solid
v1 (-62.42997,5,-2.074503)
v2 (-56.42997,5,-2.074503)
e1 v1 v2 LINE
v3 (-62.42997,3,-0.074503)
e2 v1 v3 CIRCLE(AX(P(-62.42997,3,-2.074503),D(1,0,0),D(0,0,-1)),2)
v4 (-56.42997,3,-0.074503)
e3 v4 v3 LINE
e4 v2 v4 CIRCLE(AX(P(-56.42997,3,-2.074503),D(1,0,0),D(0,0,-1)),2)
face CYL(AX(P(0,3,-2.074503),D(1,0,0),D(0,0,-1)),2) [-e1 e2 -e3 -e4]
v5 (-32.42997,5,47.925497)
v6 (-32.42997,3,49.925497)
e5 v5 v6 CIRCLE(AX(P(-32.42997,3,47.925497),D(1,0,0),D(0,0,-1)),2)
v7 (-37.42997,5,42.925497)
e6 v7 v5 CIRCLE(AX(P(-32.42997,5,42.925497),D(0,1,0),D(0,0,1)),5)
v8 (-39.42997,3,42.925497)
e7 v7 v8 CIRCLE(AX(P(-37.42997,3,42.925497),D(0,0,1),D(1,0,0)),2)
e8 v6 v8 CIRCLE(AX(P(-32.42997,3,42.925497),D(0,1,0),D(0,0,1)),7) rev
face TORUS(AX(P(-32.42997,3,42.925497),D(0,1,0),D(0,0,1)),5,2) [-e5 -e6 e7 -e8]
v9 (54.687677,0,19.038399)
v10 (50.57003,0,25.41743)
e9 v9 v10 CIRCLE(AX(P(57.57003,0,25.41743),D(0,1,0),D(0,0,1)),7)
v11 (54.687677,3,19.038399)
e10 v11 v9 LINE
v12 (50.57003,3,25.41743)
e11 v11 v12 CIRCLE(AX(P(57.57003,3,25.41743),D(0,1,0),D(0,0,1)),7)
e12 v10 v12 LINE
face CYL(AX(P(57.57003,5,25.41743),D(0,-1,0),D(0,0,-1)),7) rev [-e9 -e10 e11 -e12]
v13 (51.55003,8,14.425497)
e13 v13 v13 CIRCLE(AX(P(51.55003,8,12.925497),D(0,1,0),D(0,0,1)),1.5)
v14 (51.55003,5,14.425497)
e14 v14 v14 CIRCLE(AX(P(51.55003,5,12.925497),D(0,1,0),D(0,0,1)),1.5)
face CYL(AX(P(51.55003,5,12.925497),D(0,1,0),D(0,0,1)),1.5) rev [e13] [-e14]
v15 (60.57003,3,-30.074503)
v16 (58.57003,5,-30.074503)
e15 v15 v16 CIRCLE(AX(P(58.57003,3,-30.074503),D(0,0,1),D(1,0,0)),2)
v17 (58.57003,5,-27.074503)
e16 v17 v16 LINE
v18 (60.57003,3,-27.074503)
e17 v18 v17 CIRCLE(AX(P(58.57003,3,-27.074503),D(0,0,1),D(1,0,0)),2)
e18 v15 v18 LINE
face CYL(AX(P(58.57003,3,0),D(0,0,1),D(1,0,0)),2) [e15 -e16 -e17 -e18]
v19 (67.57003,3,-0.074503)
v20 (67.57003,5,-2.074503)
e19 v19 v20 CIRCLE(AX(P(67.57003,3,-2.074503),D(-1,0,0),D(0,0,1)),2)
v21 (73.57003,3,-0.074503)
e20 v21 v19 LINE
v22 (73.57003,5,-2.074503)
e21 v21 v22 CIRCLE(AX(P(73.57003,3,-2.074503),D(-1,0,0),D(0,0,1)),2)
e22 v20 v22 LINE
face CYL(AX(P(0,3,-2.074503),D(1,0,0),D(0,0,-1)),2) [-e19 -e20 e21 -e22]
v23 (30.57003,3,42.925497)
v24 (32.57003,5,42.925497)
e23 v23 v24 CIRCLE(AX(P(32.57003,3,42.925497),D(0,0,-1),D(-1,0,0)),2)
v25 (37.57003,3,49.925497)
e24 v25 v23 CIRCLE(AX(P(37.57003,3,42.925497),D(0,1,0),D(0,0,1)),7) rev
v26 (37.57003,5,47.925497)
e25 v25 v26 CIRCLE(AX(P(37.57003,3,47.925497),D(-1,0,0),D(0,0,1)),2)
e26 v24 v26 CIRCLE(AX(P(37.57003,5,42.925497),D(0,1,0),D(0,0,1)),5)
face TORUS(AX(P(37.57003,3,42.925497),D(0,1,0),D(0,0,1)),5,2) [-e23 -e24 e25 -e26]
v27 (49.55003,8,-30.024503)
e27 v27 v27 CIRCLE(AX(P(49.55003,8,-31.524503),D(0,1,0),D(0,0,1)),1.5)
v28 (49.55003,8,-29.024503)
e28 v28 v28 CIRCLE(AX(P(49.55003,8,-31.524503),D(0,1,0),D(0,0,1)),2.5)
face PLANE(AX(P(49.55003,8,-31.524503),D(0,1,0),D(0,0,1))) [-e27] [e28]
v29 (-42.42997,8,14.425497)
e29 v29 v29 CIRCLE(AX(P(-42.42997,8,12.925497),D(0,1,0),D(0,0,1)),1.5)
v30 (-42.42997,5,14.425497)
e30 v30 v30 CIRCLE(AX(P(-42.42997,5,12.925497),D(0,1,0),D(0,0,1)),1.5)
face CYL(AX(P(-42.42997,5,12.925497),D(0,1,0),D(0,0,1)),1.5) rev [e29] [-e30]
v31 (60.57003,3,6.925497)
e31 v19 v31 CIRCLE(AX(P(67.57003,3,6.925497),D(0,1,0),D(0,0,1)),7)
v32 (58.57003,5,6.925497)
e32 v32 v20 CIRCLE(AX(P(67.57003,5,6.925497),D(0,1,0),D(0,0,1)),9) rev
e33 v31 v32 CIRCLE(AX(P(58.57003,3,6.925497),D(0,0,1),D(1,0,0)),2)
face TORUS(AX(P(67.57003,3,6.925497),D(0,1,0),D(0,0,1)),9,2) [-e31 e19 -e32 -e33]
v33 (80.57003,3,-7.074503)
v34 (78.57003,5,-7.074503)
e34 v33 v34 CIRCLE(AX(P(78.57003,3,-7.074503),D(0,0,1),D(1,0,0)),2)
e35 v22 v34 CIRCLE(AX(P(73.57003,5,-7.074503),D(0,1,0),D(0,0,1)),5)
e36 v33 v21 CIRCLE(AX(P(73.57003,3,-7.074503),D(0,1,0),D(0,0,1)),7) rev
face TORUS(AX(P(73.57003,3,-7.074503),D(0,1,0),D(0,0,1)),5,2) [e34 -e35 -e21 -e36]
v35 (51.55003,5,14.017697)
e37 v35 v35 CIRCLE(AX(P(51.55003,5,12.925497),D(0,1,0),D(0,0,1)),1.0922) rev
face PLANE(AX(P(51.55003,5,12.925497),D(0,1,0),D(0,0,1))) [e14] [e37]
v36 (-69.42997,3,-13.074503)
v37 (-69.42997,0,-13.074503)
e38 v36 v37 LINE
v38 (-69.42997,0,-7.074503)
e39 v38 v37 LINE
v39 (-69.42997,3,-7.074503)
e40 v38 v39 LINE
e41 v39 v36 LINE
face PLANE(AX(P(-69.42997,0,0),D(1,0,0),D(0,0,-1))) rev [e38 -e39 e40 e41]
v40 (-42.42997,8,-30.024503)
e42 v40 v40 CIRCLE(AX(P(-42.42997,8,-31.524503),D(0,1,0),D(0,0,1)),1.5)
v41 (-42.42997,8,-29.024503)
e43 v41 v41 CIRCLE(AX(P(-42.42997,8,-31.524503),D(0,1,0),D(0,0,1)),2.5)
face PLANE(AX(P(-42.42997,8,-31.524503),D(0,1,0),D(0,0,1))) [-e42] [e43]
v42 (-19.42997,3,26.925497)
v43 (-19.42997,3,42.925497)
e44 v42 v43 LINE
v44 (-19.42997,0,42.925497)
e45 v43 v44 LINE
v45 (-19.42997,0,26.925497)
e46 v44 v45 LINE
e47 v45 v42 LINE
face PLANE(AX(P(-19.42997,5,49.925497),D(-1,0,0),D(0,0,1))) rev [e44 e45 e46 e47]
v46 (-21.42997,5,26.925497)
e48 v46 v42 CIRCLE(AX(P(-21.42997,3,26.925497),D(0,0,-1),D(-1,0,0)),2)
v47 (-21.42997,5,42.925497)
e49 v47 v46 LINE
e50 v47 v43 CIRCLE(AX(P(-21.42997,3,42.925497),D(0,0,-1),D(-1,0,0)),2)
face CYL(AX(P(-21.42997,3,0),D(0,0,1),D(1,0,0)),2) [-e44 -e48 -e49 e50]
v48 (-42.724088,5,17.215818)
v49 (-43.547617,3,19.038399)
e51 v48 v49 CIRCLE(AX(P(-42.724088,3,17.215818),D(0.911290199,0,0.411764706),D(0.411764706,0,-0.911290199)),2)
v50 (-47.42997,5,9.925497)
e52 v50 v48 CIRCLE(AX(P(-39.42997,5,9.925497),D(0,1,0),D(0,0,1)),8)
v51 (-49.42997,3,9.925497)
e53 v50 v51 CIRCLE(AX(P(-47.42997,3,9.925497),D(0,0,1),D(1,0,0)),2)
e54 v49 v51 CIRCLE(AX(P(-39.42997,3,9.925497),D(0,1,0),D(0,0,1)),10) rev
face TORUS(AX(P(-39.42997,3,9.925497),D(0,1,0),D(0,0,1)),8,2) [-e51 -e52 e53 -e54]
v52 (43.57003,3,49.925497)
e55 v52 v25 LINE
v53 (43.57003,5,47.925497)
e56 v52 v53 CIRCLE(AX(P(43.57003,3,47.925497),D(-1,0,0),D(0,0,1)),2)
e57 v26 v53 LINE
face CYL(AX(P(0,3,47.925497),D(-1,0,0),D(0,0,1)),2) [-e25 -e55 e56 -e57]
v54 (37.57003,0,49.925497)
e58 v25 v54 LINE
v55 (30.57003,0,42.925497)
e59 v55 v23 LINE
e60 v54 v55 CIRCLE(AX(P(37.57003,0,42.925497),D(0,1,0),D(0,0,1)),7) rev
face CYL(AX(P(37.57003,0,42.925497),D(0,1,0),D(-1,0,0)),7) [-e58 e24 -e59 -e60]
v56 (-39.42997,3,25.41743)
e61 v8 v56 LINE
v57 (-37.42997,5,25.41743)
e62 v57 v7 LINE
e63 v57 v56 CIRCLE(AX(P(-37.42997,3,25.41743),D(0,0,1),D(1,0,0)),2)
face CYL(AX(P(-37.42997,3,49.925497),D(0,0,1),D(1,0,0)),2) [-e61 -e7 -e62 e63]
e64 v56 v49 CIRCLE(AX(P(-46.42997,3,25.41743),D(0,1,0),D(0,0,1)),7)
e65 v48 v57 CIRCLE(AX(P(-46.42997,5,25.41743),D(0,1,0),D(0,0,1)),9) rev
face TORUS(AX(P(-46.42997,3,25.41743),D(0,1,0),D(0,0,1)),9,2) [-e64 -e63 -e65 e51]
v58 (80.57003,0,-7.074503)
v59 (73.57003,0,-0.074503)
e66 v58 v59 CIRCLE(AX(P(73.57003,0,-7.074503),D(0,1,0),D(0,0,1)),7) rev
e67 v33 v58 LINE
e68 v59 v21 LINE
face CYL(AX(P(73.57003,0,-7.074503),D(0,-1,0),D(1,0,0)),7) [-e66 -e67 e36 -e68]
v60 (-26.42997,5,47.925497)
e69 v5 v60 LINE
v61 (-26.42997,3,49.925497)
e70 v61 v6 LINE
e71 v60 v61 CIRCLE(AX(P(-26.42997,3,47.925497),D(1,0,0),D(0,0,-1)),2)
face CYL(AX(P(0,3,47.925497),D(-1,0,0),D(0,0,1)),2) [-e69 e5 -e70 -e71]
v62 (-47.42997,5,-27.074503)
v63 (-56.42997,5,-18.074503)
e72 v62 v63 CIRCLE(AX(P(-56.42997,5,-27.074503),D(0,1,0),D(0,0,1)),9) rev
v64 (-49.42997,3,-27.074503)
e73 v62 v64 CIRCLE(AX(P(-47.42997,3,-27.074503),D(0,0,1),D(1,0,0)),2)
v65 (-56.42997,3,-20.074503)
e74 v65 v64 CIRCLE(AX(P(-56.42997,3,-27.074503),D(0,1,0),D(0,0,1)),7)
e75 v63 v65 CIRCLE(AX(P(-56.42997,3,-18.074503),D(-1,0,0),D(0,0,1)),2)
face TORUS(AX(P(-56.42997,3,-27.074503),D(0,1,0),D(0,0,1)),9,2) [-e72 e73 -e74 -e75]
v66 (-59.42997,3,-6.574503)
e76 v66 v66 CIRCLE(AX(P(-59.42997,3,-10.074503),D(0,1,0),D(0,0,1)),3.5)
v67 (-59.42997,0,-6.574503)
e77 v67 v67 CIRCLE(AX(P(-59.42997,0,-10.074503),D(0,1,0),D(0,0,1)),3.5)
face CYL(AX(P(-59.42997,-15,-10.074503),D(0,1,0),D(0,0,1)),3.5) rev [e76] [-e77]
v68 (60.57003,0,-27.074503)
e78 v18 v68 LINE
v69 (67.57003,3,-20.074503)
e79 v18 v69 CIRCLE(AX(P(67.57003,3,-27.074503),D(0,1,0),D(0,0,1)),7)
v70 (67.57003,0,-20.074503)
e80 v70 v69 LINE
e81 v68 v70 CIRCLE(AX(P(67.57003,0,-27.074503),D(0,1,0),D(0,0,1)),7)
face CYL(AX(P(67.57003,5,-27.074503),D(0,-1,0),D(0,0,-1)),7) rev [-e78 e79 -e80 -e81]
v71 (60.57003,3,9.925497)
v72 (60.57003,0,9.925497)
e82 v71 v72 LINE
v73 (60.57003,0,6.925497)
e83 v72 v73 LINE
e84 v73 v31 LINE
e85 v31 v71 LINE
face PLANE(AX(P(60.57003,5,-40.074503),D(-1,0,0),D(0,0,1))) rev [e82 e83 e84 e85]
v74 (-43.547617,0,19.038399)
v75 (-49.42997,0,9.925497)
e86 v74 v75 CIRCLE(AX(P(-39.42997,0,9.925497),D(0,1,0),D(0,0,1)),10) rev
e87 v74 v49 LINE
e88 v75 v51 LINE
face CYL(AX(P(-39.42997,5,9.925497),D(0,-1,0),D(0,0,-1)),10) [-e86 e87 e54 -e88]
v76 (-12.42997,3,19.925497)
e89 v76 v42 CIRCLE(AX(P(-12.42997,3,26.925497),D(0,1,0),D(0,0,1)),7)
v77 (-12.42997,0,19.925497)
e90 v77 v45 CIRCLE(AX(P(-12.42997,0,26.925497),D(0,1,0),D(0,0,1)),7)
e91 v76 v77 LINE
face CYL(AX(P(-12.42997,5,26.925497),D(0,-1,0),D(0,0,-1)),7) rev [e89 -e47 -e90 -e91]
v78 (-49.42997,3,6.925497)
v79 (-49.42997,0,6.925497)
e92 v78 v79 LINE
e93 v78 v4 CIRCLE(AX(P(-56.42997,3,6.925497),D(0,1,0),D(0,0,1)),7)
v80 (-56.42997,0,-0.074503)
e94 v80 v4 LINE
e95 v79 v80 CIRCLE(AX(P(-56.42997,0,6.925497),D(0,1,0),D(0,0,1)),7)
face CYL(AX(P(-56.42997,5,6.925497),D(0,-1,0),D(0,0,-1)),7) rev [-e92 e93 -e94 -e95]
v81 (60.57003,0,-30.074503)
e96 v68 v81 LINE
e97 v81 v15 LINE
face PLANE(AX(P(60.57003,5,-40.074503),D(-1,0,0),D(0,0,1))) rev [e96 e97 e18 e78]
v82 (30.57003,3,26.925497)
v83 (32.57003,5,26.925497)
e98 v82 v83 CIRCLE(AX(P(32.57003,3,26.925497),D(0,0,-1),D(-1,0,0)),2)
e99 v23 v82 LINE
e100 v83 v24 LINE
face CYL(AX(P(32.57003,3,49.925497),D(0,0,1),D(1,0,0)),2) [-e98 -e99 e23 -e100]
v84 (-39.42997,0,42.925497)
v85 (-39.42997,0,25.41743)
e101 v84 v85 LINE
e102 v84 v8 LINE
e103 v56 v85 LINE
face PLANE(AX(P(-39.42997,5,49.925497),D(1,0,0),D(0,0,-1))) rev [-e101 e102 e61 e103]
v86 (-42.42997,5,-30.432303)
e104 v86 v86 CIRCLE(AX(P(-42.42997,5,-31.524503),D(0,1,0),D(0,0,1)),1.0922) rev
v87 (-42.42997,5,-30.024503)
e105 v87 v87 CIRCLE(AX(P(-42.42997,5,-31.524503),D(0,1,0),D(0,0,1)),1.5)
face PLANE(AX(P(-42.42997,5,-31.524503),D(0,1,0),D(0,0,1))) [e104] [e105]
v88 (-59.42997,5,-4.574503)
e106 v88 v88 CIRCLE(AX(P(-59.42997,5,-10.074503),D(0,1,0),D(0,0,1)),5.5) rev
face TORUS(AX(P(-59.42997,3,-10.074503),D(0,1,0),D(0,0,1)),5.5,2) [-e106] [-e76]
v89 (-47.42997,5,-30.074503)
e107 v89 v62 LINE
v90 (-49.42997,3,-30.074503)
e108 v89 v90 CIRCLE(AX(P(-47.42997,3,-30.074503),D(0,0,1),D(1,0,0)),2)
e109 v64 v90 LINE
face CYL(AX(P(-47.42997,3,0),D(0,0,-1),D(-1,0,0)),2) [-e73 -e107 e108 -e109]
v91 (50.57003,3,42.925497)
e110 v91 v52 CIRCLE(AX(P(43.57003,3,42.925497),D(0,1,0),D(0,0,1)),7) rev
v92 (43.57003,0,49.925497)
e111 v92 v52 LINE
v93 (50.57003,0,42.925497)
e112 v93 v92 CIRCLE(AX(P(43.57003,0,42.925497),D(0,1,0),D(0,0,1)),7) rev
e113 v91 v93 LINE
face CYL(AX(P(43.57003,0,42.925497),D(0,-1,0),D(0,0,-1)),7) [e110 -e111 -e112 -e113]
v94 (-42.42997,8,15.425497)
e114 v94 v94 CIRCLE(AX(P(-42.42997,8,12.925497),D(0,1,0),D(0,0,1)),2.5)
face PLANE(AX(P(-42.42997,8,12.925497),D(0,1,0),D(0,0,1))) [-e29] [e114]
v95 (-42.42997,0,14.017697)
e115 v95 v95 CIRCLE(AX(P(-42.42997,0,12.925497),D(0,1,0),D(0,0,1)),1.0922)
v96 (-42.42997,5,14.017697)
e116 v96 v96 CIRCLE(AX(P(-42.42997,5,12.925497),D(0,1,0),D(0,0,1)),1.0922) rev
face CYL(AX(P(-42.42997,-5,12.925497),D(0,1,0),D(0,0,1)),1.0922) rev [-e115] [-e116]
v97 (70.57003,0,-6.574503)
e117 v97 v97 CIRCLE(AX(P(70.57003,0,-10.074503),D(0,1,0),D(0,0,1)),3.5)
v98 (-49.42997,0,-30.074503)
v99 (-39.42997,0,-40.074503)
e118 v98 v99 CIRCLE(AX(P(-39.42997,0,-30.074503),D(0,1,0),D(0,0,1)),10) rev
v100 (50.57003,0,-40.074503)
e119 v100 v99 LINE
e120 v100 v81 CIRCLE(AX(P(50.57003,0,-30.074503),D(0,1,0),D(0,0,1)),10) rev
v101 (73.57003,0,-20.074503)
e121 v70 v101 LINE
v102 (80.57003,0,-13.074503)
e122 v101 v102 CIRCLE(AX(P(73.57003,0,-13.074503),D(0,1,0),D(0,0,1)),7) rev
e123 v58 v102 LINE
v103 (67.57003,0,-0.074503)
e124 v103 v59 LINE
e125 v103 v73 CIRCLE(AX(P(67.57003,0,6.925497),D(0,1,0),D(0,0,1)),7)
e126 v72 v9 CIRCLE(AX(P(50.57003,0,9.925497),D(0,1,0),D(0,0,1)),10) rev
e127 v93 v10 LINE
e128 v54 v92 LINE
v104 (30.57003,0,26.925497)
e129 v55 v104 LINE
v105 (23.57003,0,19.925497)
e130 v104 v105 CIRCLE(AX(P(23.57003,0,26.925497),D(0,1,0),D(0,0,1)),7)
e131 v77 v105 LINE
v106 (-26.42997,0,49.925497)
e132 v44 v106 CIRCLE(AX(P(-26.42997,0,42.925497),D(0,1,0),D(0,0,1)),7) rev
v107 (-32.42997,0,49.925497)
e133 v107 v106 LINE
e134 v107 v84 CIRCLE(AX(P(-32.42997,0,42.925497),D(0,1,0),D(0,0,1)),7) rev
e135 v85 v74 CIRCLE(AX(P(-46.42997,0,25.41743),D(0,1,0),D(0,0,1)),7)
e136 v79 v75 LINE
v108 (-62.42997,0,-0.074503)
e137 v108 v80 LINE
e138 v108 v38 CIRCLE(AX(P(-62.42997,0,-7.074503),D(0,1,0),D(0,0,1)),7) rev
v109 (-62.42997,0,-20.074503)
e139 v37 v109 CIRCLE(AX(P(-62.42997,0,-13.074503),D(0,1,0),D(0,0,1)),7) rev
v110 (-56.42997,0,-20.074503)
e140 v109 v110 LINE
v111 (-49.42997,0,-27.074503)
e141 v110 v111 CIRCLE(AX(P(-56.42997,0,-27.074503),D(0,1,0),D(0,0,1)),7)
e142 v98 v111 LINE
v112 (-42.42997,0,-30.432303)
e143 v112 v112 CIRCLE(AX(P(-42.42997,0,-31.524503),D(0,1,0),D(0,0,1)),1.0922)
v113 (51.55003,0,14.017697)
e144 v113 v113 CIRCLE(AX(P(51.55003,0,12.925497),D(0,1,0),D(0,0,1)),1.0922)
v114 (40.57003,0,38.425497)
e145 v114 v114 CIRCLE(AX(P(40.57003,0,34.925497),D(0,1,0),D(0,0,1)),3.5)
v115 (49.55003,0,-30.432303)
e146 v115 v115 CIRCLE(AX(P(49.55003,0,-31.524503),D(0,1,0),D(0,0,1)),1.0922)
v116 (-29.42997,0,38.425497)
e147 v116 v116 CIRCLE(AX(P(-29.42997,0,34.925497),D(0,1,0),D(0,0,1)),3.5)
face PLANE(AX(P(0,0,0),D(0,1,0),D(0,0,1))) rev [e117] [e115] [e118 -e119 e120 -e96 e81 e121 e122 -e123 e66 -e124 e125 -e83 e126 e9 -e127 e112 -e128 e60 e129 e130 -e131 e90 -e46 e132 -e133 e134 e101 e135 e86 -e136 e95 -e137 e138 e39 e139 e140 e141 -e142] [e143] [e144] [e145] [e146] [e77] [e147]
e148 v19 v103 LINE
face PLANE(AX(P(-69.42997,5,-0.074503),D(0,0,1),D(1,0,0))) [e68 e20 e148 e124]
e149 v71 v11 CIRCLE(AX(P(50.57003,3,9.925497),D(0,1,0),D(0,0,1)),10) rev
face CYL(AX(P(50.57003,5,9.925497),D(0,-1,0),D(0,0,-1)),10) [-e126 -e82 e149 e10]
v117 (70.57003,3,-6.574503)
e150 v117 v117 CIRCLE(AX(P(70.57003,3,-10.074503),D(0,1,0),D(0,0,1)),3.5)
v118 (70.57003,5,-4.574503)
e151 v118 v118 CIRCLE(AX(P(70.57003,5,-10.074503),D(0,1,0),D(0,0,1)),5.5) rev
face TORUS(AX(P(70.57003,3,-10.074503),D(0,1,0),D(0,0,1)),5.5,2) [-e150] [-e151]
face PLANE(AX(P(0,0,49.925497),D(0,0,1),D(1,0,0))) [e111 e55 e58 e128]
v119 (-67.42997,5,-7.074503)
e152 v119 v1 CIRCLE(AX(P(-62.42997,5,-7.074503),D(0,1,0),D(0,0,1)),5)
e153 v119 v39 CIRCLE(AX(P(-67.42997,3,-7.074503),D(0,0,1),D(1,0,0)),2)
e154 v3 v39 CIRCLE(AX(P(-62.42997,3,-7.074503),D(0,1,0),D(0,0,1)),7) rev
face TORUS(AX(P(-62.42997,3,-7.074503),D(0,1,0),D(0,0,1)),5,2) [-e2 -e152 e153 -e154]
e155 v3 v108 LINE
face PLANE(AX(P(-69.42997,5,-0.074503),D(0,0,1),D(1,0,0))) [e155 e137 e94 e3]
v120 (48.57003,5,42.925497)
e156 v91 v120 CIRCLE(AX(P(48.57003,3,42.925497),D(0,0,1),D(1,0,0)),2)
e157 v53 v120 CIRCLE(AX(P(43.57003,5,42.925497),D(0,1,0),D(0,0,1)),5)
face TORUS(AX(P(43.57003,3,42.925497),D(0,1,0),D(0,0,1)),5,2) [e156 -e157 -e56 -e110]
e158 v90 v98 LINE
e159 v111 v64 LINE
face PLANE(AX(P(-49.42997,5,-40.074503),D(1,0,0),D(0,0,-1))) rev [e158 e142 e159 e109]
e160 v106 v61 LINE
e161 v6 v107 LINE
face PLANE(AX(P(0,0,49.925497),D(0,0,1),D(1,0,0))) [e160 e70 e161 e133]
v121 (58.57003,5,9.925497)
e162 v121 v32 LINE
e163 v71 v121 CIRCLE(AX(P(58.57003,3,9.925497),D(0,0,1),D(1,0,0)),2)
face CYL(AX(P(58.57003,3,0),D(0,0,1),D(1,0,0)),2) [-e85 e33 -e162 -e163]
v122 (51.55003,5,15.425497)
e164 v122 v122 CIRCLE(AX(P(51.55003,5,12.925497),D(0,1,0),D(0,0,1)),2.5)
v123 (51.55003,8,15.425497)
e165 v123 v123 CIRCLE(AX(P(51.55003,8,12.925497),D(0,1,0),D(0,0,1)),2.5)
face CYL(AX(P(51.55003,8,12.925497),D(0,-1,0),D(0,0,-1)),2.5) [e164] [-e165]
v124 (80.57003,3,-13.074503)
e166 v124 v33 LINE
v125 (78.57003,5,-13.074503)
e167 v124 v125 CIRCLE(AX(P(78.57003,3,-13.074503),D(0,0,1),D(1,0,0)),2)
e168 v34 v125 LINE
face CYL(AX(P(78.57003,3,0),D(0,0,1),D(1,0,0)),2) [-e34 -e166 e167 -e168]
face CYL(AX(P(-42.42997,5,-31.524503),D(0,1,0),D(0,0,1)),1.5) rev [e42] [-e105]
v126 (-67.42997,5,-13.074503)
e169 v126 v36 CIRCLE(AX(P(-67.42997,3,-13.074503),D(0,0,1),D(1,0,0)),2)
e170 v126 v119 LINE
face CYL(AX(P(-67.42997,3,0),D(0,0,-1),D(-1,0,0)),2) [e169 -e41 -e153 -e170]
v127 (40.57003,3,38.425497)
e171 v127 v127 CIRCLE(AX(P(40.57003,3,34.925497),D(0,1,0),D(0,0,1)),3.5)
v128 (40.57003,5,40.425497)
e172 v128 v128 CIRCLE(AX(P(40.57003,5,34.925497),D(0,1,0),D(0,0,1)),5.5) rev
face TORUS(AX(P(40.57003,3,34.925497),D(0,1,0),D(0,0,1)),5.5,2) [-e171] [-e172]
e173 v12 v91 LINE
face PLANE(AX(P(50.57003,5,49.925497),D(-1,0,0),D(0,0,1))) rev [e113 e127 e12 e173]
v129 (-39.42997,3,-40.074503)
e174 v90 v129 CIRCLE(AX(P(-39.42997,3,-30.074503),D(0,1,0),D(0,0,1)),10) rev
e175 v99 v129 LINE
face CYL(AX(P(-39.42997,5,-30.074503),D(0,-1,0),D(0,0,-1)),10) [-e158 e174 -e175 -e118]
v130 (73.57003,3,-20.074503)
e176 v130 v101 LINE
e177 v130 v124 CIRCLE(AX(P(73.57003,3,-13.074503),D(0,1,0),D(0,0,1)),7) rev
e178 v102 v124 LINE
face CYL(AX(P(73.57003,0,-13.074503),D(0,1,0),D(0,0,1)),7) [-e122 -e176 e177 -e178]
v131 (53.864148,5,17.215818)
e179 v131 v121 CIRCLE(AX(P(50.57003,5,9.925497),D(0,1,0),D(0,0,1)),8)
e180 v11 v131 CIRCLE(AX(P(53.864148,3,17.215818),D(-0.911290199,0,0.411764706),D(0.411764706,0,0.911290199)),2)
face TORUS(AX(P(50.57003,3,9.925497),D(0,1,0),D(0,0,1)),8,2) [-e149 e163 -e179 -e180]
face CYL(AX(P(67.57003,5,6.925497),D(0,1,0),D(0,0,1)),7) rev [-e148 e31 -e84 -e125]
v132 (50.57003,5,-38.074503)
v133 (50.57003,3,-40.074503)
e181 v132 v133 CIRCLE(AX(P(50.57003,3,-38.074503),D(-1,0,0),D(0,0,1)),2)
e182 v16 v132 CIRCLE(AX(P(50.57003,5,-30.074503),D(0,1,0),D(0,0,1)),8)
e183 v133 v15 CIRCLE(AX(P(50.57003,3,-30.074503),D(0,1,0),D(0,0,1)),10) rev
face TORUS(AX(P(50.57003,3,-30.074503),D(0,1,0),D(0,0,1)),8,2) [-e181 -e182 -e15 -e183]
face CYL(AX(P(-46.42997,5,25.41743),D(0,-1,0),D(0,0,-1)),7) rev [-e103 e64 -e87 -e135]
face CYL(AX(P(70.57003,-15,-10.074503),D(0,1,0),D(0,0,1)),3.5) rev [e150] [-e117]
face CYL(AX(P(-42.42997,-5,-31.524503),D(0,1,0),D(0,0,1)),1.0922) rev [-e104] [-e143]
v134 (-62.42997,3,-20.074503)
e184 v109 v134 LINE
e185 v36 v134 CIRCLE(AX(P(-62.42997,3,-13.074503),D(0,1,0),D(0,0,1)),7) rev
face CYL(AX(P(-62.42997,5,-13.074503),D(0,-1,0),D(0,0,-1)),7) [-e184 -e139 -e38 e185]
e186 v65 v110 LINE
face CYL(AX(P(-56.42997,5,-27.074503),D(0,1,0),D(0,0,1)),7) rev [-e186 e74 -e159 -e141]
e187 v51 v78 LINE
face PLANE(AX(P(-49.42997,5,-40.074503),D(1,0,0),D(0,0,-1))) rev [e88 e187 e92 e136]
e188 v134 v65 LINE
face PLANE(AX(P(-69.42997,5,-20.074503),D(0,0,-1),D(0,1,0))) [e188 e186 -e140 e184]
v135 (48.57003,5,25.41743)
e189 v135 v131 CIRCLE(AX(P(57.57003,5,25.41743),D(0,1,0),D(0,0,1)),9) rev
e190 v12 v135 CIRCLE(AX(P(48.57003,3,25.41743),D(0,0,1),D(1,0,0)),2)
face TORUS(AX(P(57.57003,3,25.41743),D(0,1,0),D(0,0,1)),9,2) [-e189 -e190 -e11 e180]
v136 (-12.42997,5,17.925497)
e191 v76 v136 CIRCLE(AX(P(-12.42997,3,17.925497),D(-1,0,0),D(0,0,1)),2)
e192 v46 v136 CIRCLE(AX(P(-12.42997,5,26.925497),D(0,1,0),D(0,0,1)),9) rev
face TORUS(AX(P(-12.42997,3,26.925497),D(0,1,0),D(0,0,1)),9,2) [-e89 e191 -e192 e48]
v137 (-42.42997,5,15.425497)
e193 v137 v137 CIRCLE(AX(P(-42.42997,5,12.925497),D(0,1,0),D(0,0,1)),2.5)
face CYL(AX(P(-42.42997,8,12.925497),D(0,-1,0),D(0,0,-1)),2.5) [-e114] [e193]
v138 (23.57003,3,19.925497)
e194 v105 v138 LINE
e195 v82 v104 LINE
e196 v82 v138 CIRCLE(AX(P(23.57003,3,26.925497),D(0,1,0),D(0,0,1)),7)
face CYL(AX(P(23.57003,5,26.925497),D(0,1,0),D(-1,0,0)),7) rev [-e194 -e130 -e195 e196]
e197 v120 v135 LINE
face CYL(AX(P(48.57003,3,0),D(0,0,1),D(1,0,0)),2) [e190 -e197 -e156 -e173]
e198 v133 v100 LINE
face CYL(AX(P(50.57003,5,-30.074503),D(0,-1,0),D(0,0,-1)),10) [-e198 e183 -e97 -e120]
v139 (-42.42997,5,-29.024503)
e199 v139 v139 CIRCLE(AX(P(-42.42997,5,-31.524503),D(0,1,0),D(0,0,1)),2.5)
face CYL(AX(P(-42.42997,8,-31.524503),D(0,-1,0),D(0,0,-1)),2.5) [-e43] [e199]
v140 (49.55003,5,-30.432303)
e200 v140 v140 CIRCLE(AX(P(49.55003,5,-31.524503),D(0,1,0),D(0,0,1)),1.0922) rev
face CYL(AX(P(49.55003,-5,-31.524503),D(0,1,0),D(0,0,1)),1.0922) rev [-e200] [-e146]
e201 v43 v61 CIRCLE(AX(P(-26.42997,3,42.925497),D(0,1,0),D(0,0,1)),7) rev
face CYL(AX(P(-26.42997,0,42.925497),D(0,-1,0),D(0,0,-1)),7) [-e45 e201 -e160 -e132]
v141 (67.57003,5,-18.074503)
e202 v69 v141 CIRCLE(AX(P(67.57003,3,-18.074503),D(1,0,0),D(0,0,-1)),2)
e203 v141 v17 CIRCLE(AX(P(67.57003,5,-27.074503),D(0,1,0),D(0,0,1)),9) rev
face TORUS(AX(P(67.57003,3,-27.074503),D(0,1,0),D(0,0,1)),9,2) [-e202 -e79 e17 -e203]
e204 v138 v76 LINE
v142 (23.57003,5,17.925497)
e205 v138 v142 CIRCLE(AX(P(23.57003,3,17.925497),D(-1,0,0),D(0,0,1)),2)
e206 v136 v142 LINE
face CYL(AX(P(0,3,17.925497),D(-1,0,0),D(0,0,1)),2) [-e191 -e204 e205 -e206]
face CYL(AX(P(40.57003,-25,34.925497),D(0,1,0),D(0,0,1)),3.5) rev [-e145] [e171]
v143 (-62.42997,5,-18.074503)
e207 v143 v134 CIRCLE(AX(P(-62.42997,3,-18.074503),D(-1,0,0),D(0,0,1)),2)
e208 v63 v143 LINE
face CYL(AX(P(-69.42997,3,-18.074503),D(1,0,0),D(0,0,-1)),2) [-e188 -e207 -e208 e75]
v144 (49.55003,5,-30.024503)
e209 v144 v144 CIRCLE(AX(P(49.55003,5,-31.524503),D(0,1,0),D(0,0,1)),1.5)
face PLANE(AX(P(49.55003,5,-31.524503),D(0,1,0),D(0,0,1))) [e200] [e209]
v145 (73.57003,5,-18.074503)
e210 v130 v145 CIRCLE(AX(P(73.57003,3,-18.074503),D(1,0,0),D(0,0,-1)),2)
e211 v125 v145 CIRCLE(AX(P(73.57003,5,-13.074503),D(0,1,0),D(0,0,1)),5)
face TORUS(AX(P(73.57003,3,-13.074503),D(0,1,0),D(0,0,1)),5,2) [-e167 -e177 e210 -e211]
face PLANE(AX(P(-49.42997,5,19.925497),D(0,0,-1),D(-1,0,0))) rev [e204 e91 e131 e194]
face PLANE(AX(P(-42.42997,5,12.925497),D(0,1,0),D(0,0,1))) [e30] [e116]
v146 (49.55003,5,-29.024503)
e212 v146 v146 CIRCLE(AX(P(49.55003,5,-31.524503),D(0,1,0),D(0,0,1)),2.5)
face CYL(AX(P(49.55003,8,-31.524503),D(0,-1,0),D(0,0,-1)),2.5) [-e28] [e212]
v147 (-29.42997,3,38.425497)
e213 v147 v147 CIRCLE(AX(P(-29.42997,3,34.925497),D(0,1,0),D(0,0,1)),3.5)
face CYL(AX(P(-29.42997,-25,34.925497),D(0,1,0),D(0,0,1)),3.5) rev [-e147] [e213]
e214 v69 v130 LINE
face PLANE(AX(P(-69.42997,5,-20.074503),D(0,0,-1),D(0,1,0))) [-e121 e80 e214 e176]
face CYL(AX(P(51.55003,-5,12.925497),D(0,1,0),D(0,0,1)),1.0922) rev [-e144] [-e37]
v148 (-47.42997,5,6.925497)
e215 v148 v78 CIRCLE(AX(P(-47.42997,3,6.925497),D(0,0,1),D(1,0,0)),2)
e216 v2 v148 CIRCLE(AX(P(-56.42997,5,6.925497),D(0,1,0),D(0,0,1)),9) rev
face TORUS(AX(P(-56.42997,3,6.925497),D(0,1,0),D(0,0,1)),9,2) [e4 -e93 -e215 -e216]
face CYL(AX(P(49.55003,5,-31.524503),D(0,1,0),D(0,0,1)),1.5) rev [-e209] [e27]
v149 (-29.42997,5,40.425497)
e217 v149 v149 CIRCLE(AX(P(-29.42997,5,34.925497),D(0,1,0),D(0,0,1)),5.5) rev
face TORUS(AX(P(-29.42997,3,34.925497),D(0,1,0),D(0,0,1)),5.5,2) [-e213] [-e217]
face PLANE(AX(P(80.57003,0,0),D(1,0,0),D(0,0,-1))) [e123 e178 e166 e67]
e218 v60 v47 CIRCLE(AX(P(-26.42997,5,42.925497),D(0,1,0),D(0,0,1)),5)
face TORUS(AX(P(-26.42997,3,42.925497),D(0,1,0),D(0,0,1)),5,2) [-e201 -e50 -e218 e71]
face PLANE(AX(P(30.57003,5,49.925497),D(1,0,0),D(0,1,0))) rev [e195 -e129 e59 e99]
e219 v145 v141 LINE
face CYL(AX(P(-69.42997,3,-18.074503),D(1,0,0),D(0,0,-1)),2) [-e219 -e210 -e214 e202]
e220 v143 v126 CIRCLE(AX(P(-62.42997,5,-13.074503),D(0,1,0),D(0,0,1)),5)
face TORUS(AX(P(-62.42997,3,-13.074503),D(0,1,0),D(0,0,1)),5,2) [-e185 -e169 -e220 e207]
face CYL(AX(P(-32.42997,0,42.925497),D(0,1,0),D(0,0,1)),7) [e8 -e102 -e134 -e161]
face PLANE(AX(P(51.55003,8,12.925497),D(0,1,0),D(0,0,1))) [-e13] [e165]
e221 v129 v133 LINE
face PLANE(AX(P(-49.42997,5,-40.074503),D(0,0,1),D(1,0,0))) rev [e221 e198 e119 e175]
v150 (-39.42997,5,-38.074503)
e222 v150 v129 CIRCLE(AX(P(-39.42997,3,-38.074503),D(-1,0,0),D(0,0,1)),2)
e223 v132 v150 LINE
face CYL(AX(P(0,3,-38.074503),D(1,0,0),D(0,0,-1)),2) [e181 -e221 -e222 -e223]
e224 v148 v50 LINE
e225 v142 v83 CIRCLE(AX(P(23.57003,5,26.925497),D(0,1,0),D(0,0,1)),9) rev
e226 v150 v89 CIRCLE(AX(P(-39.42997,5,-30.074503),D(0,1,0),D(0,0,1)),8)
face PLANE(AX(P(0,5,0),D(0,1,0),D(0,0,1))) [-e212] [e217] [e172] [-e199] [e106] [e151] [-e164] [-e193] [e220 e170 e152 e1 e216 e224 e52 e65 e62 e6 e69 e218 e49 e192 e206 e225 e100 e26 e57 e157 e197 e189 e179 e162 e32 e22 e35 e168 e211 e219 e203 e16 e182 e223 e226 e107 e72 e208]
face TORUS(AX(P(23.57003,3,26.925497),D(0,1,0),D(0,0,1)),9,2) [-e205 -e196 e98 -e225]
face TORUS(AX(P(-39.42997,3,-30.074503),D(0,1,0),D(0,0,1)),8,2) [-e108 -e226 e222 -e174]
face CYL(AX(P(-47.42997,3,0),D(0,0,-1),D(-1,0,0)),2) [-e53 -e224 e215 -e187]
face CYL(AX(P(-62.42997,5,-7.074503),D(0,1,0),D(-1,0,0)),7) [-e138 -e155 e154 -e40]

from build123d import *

# Parameters (mm, degrees)
SKETCH1_W                = 110
SKETCH1_H                = 60
BOSS_EXTRUDE1_DEPTH      = 5
SKETCH2_R                = 1.0922
CUT_EXTRUDE1_DEPTH       = 10
SKETCH3_R                = 2.5
BOSS_EXTRUDE2_DEPTH      = 3
SKETCH4_R                = 1.5
CUT_EXTRUDE2_DEPTH       = 3
BOSS_EXTRUDE3_DEPTH      = 20
BOSS_EXTRUDE3_DEPTH_BACK = 130
SKETCH5_W                = 20
SKETCH5_H                = 5
SKETCH6_R                = 3.5
CUT_EXTRUDE3_DEPTH       = 20
SKETCH7_W                = 20
SKETCH7_H                = 5
BOSS_EXTRUDE4_DEPTH      = 30
SKETCH8_R                = 3.5
CUT_EXTRUDE4_DEPTH       = 30
FILLET1_R                = 10
FILLET2_R                = 7
FILLET3_R                = 7
FILLET4_R                = 2
FILLET5_R                = 2
FILLET6_R                = 2


with BuildPart() as part:
    # Sketch1 → Boss-Extrude1 (new body)
    with BuildSketch(Plane(origin=(0, 0, 0), x_dir=(1, 0, 0), z_dir=(0, 1, 0))):
        with Locations((5.570029996, 10.074503483)):
            Rectangle(SKETCH1_W, SKETCH1_H)
    extrude(amount=BOSS_EXTRUDE1_DEPTH)

    # Sketch2 → Cut-Extrude1 (cut)
    with BuildSketch(Plane(origin=(0, 5, 0), x_dir=(1, 0, 0), z_dir=(0, 1, 0))):
        with Locations(Location((-42.429970004, 31.524503483, 0), (0, 0, 270))):
            Circle(SKETCH2_R)
        with Locations(Location((-42.429970004, -12.925496517, 0), (0, 0, 270))):
            Circle(SKETCH2_R)
        with Locations(Location((51.550029996, -12.925496517, 0), (0, 0, 270))):
            Circle(SKETCH2_R)
        with Locations(Location((49.550029996, 31.524503483, 0), (0, 0, 270))):
            Circle(SKETCH2_R)
    extrude(amount=-CUT_EXTRUDE1_DEPTH, mode=Mode.SUBTRACT)

    # Sketch3 → Boss-Extrude2 (add)
    with BuildSketch(Plane(origin=(0, 5, 0), x_dir=(1, 0, 0), z_dir=(0, 1, 0))):
        with Locations(Location((-42.429970004, 31.524503483, 0), (0, 0, 270))):
            Circle(SKETCH3_R)
        with Locations(Location((-42.429970004, -12.925496517, 0), (0, 0, 270))):
            Circle(SKETCH3_R)
        with Locations(Location((51.550029996, -12.925496517, 0), (0, 0, 270))):
            Circle(SKETCH3_R)
        with Locations(Location((49.550029996, 31.524503483, 0), (0, 0, 270))):
            Circle(SKETCH3_R)
    extrude(amount=BOSS_EXTRUDE2_DEPTH)

    # Sketch4 → Cut-Extrude2 (cut)
    with BuildSketch(Plane(origin=(0, 8, 0), x_dir=(1, 0, 0), z_dir=(0, 1, 0))):
        with Locations(Location((-42.429970004, 31.524503483, 0), (0, 0, 270))):
            Circle(SKETCH4_R)
        with Locations(Location((49.550029996, 31.524503483, 0), (0, 0, 270))):
            Circle(SKETCH4_R)
        with Locations(Location((51.550029996, -12.925496517, 0), (0, 0, 270))):
            Circle(SKETCH4_R)
        with Locations(Location((-42.429970004, -12.925496517, 0), (0, 0, 270))):
            Circle(SKETCH4_R)
    extrude(amount=-CUT_EXTRUDE2_DEPTH, mode=Mode.SUBTRACT)

    # Sketch5 → Boss-Extrude3 (add, two sides: drawn at the far end of the back side and taken through both)
    with BuildSketch(Plane(origin=(60.570029996, 0, 0), x_dir=(0, 0, -1), z_dir=(1, 0, 0)).offset(-BOSS_EXTRUDE3_DEPTH_BACK)):
        with Locations((10.074503483, 2.5)):
            Rectangle(SKETCH5_W, SKETCH5_H)
    extrude(amount=BOSS_EXTRUDE3_DEPTH + BOSS_EXTRUDE3_DEPTH_BACK)

    # Sketch6 → Cut-Extrude3 (cut)
    with BuildSketch(Plane(origin=(0, 5, 0), x_dir=(1, 0, 0), z_dir=(0, 1, 0))):
        with Locations(Location((-59.429970004, 10.074503483, 0), (0, 0, 270))):
            Circle(SKETCH6_R)
        with Locations(Location((70.570029996, 10.074503483, 0), (0, 0, 270))):
            Circle(SKETCH6_R)
    extrude(amount=-CUT_EXTRUDE3_DEPTH, mode=Mode.SUBTRACT)

    # Sketch7 → Boss-Extrude4 (add)
    with BuildSketch(Plane.XY.offset(19.925496517)):
        with Locations((-29.429970004, 2.5)):
            Rectangle(SKETCH7_W, SKETCH7_H)
        with Locations((40.570029996, 2.5)):
            Rectangle(SKETCH7_W, SKETCH7_H)
    extrude(amount=BOSS_EXTRUDE4_DEPTH)

    # Sketch8 → Cut-Extrude4 (cut)
    with BuildSketch(Plane(origin=(0, 5, 0), x_dir=(1, 0, 0), z_dir=(0, 1, 0))):
        with Locations(Location((-29.429970004, -34.925496517, 0), (0, 0, 270))):
            Circle(SKETCH8_R)
        with Locations(Location((40.570029996, -34.925496517, 0), (0, 0, 270))):
            Circle(SKETCH8_R)
    extrude(amount=-CUT_EXTRUDE4_DEPTH, mode=Mode.SUBTRACT)

    # Fillet1
    fillet1_edges = [part.edges().sort_by_distance(p)[0] for p in [
        (-49.429970004, 2.5, 19.925496517),
        (-49.429970004, 2.5, -40.074503483),
        (60.570029996, 2.5, -40.074503483),
        (60.570029996, 2.5, 19.925496517),
    ]]
    fillet(fillet1_edges, radius=FILLET1_R - 0.0001)  # a hair under: the kernel refuses the full size

    # Fillet2
    fillet2_edges = [part.edges().sort_by_distance(p)[0] for p in [
        (-69.429970004, 2.5, -20.074503483),
        (-69.429970004, 2.5, -0.074503483),
        (-49.429970004, 2.5, -20.074503483),
        (60.570029996, 2.5, -20.074503483),
        (-49.429970004, 2.5, -0.074503483),
        (60.570029996, 2.5, -0.074503483),
        (80.570029996, 2.5, -20.074503483),
        (80.570029996, 2.5, -0.074503483),
    ]]
    fillet(fillet2_edges, radius=FILLET2_R)

    # Fillet3
    fillet3_edges = [part.edges().sort_by_distance(p)[0] for p in [
        (30.570029996, 2.5, 19.925496517),
        (50.570029996, 2.5, 19.925496517),
        (50.570029996, 2.5, 49.925496517),
        (30.570029996, 2.5, 49.925496517),
        (-19.429970004, 2.5, 49.925496517),
        (-19.429970004, 2.5, 19.925496517),
        (-39.429970004, 2.5, 19.925496517),
        (-39.429970004, 2.5, 49.925496517),
    ]]
    fillet(fillet3_edges, radius=FILLET3_R)

    # Fillet4
    fillet4_edges = [part.edges().sort_by_distance(p)[0] for p in [
        (60.570029996, 5, 8.425546517),
        (5.570029996, 5, -40.074503483),
        (-49.429970004, 5, -28.574553483),
        (57.641127097, 5, -37.145600584),
        (-46.501067106, 5, -37.145600584),
        (-47.831656196, 5, 15.348819681),
        (60.570029996, 5, -28.574553483),
        (70.570029996, 5, -20.074503483),
        (70.570029996, 5, -0.074503483),
        (-49.429970004, 5, 8.425546517),
        (-59.429970004, 5, -0.074503483),
        (-59.429970004, 5, -20.074503483),
        (80.570029996, 5, -10.074503483),
        (-69.429970004, 5, -10.074503483),
        (78.519777464, 5, -2.124756015),
        (78.519777464, 5, -18.024250951),
        (-67.379717473, 5, -2.124756015),
        (-67.379717473, 5, -18.024250951),
        (62.620282527, 5, -22.124756015),
        (62.620282527, 5, 1.975749049),
        (-51.480222536, 5, 1.975749049),
        (-51.480222536, 5, -22.124756015),
        (30.570029996, 5, 34.925496517),
        (5.570029996, 5, 19.925496517),
        (50.570029996, 5, 34.171480935),
        (58.971716187, 5, 15.348819681),
        (40.570029996, 5, 49.925496517),
        (-39.429970004, 5, 34.171480935),
        (-29.429970004, 5, 49.925496517),
        (-19.429970004, 5, 34.925496517),
        (-37.379717473, 5, 47.875243985),
        (-21.480222536, 5, 47.875243985),
        (32.620282527, 5, 47.875243985),
        (48.519777464, 5, 47.875243985),
        (28.519777464, 5, 21.975749049),
        (51.68886085, 5, 21.621171175),
        (-17.379717473, 5, 21.975749049),
        (-40.548800859, 5, 21.621171175),
    ]]
    fillet(fillet4_edges, radius=FILLET4_R)

    # Fillet5
    fillet5_edges = [part.edges().sort_by_distance(p)[0] for p in [
        (-59.429970004, 5, -13.574503483),
        (70.570029996, 5, -13.574503483),
    ]]
    fillet(fillet5_edges, radius=FILLET5_R)

    # Fillet6
    fillet6_edges = [part.edges().sort_by_distance(p)[0] for p in [
        (-29.429970004, 5, 31.425496517),
        (40.570029996, 5, 31.425496517),
    ]]
    fillet(fillet6_edges, radius=FILLET6_R)


solid = part.part
